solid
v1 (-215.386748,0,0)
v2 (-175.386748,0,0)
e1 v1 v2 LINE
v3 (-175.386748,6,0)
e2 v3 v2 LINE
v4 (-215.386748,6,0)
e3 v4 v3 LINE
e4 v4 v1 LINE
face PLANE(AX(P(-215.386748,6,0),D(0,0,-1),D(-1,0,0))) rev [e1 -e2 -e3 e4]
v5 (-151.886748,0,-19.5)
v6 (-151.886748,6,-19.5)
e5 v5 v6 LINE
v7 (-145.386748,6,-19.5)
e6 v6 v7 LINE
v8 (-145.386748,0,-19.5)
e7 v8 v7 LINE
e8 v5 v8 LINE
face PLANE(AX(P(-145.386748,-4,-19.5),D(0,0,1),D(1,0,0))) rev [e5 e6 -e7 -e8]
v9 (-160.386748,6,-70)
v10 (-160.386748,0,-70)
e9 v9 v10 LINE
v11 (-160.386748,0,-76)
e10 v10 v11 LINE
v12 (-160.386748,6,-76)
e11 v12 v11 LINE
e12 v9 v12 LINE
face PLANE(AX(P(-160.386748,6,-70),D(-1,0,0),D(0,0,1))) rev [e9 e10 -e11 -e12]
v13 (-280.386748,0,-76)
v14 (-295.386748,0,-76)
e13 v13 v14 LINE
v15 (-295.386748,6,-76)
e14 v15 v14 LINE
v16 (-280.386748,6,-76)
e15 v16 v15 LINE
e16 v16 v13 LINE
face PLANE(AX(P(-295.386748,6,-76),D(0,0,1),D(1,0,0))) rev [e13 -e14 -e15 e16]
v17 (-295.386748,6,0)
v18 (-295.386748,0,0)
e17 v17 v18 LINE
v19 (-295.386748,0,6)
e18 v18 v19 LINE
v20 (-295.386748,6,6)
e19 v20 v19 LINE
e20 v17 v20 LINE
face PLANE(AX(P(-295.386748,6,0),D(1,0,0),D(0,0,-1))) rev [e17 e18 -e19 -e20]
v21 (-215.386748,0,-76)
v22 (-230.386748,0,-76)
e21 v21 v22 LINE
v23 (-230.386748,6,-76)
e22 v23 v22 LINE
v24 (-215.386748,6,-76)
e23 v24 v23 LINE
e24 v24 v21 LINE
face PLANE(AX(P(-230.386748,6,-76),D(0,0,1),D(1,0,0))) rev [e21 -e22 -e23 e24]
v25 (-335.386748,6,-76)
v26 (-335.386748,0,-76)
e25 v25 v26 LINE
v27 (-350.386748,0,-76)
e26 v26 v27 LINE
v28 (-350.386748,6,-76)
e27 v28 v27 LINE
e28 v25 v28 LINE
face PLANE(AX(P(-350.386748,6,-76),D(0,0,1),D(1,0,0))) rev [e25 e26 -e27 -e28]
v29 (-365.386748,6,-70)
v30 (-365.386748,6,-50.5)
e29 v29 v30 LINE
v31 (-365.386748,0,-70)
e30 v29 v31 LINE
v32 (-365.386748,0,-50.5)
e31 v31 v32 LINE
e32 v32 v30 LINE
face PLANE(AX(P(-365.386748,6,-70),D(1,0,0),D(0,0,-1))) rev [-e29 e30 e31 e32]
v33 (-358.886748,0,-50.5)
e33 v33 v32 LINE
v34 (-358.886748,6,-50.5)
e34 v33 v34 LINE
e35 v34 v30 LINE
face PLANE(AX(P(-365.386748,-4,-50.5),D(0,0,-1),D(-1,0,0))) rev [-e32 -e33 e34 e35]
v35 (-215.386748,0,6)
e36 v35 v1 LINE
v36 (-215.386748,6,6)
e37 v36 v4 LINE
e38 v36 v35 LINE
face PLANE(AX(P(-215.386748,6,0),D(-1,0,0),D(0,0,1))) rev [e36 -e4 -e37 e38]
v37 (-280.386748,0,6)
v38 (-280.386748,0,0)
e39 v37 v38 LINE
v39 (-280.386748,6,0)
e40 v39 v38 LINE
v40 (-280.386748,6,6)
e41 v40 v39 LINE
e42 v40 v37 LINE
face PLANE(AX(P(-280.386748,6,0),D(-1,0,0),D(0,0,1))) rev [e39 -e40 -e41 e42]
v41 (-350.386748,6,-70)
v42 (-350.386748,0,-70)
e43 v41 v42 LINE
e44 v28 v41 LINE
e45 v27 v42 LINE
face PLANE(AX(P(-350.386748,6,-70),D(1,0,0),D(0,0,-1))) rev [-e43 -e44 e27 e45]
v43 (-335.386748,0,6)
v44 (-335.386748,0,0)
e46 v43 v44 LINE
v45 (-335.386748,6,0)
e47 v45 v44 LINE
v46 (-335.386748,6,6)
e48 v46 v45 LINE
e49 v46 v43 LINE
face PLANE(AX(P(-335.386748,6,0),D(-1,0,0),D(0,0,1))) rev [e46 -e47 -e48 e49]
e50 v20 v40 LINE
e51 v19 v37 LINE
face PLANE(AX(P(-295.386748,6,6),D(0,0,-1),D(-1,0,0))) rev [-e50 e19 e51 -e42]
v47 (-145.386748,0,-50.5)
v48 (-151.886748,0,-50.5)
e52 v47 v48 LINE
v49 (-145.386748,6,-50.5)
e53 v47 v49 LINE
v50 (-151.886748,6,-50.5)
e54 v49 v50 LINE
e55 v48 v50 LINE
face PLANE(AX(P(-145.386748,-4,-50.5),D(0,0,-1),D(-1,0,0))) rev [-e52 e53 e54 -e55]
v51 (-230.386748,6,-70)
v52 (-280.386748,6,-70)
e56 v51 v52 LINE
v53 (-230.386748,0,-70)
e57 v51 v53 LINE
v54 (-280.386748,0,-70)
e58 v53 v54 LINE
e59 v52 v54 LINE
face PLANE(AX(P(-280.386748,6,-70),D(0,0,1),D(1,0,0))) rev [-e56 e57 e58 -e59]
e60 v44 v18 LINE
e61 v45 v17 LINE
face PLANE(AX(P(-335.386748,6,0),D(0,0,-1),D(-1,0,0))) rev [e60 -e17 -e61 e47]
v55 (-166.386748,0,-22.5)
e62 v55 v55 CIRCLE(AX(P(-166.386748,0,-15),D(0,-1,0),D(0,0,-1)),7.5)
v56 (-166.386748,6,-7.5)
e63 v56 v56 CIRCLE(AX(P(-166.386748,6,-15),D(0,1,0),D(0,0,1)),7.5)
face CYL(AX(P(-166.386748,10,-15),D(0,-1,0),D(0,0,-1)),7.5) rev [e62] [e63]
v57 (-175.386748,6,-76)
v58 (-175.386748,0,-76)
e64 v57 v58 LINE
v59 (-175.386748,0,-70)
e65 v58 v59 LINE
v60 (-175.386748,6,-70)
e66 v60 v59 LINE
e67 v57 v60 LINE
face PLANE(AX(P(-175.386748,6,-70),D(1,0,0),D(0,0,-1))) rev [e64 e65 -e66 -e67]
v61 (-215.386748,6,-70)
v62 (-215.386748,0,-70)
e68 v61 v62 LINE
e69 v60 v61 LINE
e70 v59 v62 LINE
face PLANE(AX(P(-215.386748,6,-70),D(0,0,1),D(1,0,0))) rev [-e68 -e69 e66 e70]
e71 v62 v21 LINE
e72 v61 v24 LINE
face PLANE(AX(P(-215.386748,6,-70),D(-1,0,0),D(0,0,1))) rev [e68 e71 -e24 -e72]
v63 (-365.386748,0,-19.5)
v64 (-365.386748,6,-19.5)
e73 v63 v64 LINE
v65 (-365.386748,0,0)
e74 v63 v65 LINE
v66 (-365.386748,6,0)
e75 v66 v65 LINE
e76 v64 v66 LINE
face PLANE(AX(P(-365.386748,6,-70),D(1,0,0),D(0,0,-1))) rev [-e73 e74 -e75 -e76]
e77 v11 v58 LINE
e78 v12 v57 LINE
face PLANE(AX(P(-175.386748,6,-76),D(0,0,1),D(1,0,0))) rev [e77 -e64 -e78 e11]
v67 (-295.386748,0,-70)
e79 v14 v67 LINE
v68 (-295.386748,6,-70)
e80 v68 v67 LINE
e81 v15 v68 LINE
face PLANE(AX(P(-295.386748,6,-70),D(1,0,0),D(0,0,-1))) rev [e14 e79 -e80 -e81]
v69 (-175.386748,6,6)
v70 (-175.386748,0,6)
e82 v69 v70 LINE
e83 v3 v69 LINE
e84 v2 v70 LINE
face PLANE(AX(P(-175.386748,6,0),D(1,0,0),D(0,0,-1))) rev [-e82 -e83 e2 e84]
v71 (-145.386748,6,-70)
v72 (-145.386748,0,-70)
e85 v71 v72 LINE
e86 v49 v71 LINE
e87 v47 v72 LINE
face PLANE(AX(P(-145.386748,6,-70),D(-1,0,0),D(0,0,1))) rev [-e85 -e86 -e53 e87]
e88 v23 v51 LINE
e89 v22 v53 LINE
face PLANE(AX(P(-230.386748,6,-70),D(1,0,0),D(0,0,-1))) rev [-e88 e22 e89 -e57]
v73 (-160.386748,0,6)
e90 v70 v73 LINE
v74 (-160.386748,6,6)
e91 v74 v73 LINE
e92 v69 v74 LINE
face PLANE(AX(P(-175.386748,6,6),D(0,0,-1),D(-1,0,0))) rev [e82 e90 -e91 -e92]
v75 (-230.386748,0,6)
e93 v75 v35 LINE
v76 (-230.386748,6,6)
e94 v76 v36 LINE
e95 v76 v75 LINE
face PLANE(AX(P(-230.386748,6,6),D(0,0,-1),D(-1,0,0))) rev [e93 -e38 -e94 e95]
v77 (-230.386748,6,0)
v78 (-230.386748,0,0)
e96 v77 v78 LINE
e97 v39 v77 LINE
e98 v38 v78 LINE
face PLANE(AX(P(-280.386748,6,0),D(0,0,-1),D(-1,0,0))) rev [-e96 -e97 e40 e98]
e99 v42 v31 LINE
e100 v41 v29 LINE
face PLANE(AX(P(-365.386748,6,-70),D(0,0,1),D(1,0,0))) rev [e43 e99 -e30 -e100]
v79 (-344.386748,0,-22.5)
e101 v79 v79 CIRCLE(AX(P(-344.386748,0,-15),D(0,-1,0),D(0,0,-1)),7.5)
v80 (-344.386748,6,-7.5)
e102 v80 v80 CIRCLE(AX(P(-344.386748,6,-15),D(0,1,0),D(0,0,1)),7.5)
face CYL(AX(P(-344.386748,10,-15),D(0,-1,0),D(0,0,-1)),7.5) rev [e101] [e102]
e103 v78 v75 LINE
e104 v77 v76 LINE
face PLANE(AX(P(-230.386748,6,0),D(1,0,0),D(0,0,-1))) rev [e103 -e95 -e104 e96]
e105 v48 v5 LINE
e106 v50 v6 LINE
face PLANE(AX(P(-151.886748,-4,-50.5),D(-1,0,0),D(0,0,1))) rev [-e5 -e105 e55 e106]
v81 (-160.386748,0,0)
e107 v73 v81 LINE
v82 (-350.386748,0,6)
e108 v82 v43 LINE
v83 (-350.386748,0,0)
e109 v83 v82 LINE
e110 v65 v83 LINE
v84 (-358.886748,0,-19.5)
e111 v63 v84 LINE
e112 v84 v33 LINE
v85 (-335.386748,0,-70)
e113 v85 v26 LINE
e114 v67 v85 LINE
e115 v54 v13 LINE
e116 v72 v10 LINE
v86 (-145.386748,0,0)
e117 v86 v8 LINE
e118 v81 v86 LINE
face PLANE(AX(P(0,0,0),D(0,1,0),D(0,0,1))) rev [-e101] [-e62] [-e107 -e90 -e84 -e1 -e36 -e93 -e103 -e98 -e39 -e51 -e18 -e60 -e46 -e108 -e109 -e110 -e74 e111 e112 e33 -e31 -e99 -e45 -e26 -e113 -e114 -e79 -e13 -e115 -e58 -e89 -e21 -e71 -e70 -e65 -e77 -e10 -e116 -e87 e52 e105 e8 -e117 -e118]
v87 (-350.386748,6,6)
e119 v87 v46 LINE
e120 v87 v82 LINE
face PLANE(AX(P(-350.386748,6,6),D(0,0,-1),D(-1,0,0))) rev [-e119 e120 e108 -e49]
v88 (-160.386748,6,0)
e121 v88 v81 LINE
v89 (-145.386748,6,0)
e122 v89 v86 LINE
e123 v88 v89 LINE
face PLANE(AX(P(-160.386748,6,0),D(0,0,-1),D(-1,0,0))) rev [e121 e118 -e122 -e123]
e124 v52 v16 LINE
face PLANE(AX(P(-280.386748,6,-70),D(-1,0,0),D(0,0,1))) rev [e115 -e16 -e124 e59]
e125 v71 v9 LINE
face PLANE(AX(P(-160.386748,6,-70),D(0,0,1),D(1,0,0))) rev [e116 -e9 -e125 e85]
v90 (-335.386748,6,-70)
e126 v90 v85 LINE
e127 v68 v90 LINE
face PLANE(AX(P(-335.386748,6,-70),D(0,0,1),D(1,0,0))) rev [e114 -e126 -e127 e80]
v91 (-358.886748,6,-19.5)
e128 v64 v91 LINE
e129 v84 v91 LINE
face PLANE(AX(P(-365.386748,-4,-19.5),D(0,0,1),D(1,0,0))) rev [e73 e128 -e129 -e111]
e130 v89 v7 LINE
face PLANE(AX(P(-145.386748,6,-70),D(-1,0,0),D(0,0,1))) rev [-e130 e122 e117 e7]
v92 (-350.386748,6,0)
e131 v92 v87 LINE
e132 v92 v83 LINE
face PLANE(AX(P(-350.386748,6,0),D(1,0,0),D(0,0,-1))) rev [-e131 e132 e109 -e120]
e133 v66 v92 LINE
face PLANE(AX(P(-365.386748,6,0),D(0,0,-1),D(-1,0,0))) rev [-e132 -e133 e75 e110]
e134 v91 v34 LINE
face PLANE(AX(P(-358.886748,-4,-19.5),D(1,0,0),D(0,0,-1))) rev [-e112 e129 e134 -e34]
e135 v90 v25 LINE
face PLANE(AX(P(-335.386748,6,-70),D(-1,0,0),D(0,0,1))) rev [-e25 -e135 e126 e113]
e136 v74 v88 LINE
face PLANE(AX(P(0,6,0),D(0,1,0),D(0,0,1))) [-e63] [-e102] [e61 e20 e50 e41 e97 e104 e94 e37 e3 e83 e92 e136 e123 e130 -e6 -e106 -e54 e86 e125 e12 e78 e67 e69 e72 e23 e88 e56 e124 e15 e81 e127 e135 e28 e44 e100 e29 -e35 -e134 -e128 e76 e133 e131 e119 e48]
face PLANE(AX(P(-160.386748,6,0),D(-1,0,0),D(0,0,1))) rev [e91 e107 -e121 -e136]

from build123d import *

# Parameters (mm, degrees)
BOSS_EXTRUDE1_DEPTH = 6
CAVITY1_START       = -365.386748432
CAVITY1_OUTLINE_W   = 6
CAVITY1_OUTLINE_H   = 30
CAVITY1_DEPTH       = 6
CAVITY1_START_2     = -151.386748432
CAVITY1_2_OUTLINE_W = 6
CAVITY1_2_OUTLINE_H = 30
CAVITY1_2_DEPTH     = 6
SKETCH2_R           = 7.5
CUT_EXTRUDE1_DEPTH  = 10
SKETCH3_W           = 6.5
SKETCH3_H           = 31
CUT_EXTRUDE2_DEPTH  = 10


# Read off the part's stored shape, not the designer's step: Cavity1
with BuildPart() as part:
    # Sketch1 → Boss-Extrude1 (new body)
    with BuildSketch(Plane(origin=(0, 0, 0), x_dir=(1, 0, 0), z_dir=(0, 1, 0))):
        Polygon((-160.386748432, 70), (-145.386748432, 70), (-145.386748432, 0), (-160.386748432, 0), (-160.386748432, -6), (-175.386748432, -6), (-175.386748432, 0), (-215.386748432, 0), (-215.386748432, -6), (-230.386748432, -6), (-230.386748432, 0), (-280.386748432, 0), (-280.386748432, -6), (-295.386748432, -6), (-295.386748432, 0), (-335.386748432, 0), (-335.386748432, -6), (-350.386748432, -6), (-350.386748432, 0), (-365.386748432, 0), (-365.386748432, 70), (-350.386748432, 70), (-350.386748432, 76), (-335.386748432, 76), (-335.386748432, 70), (-295.386748432, 70), (-295.386748432, 76), (-280.386748432, 76), (-280.386748432, 70), (-230.386748432, 70), (-230.386748432, 76), (-215.386748432, 76), (-215.386748432, 70), (-175.386748432, 70), (-175.386748432, 76), (-160.386748432, 76), align=None)
    extrude(amount=BOSS_EXTRUDE1_DEPTH)

    # Cavity1 outline → Cavity1 (cut)
    with BuildSketch(Plane.YZ.offset(CAVITY1_START)):
        with Locations((3, -35)):
            Rectangle(CAVITY1_OUTLINE_W, CAVITY1_OUTLINE_H)
    extrude(amount=CAVITY1_DEPTH, mode=Mode.SUBTRACT)

    # Cavity1 2 outline → Cavity1 2 (cut)
    with BuildSketch(Plane.YZ.offset(CAVITY1_START_2)):
        with Locations((3, -35)):
            Rectangle(CAVITY1_2_OUTLINE_W, CAVITY1_2_OUTLINE_H)
    extrude(amount=CAVITY1_2_DEPTH, mode=Mode.SUBTRACT)

    # Sketch2 → Cut-Extrude1 (cut)
    with BuildSketch(Plane.XZ):
        with Locations(Location((-166.386748432, -15, 0), (0, 0, 270))):
            Circle(SKETCH2_R)
        with Locations(Location((-344.386748432, -15, 0), (0, 0, 270))):
            Circle(SKETCH2_R)
    extrude(amount=-CUT_EXTRUDE1_DEPTH, mode=Mode.SUBTRACT)

    # Sketch3 → Cut-Extrude2 (cut)
    with BuildSketch(Plane(origin=(0, 6, 0), x_dir=(1, 0, 0), z_dir=(0, 1, 0))):
        with Locations((-148.636748432, 35)):
            Rectangle(SKETCH3_W, SKETCH3_H)
        with Locations((-362.136748432, 35)):
            Rectangle(SKETCH3_W, SKETCH3_H)
    extrude(amount=-CUT_EXTRUDE2_DEPTH, mode=Mode.SUBTRACT)


solid = part.part
